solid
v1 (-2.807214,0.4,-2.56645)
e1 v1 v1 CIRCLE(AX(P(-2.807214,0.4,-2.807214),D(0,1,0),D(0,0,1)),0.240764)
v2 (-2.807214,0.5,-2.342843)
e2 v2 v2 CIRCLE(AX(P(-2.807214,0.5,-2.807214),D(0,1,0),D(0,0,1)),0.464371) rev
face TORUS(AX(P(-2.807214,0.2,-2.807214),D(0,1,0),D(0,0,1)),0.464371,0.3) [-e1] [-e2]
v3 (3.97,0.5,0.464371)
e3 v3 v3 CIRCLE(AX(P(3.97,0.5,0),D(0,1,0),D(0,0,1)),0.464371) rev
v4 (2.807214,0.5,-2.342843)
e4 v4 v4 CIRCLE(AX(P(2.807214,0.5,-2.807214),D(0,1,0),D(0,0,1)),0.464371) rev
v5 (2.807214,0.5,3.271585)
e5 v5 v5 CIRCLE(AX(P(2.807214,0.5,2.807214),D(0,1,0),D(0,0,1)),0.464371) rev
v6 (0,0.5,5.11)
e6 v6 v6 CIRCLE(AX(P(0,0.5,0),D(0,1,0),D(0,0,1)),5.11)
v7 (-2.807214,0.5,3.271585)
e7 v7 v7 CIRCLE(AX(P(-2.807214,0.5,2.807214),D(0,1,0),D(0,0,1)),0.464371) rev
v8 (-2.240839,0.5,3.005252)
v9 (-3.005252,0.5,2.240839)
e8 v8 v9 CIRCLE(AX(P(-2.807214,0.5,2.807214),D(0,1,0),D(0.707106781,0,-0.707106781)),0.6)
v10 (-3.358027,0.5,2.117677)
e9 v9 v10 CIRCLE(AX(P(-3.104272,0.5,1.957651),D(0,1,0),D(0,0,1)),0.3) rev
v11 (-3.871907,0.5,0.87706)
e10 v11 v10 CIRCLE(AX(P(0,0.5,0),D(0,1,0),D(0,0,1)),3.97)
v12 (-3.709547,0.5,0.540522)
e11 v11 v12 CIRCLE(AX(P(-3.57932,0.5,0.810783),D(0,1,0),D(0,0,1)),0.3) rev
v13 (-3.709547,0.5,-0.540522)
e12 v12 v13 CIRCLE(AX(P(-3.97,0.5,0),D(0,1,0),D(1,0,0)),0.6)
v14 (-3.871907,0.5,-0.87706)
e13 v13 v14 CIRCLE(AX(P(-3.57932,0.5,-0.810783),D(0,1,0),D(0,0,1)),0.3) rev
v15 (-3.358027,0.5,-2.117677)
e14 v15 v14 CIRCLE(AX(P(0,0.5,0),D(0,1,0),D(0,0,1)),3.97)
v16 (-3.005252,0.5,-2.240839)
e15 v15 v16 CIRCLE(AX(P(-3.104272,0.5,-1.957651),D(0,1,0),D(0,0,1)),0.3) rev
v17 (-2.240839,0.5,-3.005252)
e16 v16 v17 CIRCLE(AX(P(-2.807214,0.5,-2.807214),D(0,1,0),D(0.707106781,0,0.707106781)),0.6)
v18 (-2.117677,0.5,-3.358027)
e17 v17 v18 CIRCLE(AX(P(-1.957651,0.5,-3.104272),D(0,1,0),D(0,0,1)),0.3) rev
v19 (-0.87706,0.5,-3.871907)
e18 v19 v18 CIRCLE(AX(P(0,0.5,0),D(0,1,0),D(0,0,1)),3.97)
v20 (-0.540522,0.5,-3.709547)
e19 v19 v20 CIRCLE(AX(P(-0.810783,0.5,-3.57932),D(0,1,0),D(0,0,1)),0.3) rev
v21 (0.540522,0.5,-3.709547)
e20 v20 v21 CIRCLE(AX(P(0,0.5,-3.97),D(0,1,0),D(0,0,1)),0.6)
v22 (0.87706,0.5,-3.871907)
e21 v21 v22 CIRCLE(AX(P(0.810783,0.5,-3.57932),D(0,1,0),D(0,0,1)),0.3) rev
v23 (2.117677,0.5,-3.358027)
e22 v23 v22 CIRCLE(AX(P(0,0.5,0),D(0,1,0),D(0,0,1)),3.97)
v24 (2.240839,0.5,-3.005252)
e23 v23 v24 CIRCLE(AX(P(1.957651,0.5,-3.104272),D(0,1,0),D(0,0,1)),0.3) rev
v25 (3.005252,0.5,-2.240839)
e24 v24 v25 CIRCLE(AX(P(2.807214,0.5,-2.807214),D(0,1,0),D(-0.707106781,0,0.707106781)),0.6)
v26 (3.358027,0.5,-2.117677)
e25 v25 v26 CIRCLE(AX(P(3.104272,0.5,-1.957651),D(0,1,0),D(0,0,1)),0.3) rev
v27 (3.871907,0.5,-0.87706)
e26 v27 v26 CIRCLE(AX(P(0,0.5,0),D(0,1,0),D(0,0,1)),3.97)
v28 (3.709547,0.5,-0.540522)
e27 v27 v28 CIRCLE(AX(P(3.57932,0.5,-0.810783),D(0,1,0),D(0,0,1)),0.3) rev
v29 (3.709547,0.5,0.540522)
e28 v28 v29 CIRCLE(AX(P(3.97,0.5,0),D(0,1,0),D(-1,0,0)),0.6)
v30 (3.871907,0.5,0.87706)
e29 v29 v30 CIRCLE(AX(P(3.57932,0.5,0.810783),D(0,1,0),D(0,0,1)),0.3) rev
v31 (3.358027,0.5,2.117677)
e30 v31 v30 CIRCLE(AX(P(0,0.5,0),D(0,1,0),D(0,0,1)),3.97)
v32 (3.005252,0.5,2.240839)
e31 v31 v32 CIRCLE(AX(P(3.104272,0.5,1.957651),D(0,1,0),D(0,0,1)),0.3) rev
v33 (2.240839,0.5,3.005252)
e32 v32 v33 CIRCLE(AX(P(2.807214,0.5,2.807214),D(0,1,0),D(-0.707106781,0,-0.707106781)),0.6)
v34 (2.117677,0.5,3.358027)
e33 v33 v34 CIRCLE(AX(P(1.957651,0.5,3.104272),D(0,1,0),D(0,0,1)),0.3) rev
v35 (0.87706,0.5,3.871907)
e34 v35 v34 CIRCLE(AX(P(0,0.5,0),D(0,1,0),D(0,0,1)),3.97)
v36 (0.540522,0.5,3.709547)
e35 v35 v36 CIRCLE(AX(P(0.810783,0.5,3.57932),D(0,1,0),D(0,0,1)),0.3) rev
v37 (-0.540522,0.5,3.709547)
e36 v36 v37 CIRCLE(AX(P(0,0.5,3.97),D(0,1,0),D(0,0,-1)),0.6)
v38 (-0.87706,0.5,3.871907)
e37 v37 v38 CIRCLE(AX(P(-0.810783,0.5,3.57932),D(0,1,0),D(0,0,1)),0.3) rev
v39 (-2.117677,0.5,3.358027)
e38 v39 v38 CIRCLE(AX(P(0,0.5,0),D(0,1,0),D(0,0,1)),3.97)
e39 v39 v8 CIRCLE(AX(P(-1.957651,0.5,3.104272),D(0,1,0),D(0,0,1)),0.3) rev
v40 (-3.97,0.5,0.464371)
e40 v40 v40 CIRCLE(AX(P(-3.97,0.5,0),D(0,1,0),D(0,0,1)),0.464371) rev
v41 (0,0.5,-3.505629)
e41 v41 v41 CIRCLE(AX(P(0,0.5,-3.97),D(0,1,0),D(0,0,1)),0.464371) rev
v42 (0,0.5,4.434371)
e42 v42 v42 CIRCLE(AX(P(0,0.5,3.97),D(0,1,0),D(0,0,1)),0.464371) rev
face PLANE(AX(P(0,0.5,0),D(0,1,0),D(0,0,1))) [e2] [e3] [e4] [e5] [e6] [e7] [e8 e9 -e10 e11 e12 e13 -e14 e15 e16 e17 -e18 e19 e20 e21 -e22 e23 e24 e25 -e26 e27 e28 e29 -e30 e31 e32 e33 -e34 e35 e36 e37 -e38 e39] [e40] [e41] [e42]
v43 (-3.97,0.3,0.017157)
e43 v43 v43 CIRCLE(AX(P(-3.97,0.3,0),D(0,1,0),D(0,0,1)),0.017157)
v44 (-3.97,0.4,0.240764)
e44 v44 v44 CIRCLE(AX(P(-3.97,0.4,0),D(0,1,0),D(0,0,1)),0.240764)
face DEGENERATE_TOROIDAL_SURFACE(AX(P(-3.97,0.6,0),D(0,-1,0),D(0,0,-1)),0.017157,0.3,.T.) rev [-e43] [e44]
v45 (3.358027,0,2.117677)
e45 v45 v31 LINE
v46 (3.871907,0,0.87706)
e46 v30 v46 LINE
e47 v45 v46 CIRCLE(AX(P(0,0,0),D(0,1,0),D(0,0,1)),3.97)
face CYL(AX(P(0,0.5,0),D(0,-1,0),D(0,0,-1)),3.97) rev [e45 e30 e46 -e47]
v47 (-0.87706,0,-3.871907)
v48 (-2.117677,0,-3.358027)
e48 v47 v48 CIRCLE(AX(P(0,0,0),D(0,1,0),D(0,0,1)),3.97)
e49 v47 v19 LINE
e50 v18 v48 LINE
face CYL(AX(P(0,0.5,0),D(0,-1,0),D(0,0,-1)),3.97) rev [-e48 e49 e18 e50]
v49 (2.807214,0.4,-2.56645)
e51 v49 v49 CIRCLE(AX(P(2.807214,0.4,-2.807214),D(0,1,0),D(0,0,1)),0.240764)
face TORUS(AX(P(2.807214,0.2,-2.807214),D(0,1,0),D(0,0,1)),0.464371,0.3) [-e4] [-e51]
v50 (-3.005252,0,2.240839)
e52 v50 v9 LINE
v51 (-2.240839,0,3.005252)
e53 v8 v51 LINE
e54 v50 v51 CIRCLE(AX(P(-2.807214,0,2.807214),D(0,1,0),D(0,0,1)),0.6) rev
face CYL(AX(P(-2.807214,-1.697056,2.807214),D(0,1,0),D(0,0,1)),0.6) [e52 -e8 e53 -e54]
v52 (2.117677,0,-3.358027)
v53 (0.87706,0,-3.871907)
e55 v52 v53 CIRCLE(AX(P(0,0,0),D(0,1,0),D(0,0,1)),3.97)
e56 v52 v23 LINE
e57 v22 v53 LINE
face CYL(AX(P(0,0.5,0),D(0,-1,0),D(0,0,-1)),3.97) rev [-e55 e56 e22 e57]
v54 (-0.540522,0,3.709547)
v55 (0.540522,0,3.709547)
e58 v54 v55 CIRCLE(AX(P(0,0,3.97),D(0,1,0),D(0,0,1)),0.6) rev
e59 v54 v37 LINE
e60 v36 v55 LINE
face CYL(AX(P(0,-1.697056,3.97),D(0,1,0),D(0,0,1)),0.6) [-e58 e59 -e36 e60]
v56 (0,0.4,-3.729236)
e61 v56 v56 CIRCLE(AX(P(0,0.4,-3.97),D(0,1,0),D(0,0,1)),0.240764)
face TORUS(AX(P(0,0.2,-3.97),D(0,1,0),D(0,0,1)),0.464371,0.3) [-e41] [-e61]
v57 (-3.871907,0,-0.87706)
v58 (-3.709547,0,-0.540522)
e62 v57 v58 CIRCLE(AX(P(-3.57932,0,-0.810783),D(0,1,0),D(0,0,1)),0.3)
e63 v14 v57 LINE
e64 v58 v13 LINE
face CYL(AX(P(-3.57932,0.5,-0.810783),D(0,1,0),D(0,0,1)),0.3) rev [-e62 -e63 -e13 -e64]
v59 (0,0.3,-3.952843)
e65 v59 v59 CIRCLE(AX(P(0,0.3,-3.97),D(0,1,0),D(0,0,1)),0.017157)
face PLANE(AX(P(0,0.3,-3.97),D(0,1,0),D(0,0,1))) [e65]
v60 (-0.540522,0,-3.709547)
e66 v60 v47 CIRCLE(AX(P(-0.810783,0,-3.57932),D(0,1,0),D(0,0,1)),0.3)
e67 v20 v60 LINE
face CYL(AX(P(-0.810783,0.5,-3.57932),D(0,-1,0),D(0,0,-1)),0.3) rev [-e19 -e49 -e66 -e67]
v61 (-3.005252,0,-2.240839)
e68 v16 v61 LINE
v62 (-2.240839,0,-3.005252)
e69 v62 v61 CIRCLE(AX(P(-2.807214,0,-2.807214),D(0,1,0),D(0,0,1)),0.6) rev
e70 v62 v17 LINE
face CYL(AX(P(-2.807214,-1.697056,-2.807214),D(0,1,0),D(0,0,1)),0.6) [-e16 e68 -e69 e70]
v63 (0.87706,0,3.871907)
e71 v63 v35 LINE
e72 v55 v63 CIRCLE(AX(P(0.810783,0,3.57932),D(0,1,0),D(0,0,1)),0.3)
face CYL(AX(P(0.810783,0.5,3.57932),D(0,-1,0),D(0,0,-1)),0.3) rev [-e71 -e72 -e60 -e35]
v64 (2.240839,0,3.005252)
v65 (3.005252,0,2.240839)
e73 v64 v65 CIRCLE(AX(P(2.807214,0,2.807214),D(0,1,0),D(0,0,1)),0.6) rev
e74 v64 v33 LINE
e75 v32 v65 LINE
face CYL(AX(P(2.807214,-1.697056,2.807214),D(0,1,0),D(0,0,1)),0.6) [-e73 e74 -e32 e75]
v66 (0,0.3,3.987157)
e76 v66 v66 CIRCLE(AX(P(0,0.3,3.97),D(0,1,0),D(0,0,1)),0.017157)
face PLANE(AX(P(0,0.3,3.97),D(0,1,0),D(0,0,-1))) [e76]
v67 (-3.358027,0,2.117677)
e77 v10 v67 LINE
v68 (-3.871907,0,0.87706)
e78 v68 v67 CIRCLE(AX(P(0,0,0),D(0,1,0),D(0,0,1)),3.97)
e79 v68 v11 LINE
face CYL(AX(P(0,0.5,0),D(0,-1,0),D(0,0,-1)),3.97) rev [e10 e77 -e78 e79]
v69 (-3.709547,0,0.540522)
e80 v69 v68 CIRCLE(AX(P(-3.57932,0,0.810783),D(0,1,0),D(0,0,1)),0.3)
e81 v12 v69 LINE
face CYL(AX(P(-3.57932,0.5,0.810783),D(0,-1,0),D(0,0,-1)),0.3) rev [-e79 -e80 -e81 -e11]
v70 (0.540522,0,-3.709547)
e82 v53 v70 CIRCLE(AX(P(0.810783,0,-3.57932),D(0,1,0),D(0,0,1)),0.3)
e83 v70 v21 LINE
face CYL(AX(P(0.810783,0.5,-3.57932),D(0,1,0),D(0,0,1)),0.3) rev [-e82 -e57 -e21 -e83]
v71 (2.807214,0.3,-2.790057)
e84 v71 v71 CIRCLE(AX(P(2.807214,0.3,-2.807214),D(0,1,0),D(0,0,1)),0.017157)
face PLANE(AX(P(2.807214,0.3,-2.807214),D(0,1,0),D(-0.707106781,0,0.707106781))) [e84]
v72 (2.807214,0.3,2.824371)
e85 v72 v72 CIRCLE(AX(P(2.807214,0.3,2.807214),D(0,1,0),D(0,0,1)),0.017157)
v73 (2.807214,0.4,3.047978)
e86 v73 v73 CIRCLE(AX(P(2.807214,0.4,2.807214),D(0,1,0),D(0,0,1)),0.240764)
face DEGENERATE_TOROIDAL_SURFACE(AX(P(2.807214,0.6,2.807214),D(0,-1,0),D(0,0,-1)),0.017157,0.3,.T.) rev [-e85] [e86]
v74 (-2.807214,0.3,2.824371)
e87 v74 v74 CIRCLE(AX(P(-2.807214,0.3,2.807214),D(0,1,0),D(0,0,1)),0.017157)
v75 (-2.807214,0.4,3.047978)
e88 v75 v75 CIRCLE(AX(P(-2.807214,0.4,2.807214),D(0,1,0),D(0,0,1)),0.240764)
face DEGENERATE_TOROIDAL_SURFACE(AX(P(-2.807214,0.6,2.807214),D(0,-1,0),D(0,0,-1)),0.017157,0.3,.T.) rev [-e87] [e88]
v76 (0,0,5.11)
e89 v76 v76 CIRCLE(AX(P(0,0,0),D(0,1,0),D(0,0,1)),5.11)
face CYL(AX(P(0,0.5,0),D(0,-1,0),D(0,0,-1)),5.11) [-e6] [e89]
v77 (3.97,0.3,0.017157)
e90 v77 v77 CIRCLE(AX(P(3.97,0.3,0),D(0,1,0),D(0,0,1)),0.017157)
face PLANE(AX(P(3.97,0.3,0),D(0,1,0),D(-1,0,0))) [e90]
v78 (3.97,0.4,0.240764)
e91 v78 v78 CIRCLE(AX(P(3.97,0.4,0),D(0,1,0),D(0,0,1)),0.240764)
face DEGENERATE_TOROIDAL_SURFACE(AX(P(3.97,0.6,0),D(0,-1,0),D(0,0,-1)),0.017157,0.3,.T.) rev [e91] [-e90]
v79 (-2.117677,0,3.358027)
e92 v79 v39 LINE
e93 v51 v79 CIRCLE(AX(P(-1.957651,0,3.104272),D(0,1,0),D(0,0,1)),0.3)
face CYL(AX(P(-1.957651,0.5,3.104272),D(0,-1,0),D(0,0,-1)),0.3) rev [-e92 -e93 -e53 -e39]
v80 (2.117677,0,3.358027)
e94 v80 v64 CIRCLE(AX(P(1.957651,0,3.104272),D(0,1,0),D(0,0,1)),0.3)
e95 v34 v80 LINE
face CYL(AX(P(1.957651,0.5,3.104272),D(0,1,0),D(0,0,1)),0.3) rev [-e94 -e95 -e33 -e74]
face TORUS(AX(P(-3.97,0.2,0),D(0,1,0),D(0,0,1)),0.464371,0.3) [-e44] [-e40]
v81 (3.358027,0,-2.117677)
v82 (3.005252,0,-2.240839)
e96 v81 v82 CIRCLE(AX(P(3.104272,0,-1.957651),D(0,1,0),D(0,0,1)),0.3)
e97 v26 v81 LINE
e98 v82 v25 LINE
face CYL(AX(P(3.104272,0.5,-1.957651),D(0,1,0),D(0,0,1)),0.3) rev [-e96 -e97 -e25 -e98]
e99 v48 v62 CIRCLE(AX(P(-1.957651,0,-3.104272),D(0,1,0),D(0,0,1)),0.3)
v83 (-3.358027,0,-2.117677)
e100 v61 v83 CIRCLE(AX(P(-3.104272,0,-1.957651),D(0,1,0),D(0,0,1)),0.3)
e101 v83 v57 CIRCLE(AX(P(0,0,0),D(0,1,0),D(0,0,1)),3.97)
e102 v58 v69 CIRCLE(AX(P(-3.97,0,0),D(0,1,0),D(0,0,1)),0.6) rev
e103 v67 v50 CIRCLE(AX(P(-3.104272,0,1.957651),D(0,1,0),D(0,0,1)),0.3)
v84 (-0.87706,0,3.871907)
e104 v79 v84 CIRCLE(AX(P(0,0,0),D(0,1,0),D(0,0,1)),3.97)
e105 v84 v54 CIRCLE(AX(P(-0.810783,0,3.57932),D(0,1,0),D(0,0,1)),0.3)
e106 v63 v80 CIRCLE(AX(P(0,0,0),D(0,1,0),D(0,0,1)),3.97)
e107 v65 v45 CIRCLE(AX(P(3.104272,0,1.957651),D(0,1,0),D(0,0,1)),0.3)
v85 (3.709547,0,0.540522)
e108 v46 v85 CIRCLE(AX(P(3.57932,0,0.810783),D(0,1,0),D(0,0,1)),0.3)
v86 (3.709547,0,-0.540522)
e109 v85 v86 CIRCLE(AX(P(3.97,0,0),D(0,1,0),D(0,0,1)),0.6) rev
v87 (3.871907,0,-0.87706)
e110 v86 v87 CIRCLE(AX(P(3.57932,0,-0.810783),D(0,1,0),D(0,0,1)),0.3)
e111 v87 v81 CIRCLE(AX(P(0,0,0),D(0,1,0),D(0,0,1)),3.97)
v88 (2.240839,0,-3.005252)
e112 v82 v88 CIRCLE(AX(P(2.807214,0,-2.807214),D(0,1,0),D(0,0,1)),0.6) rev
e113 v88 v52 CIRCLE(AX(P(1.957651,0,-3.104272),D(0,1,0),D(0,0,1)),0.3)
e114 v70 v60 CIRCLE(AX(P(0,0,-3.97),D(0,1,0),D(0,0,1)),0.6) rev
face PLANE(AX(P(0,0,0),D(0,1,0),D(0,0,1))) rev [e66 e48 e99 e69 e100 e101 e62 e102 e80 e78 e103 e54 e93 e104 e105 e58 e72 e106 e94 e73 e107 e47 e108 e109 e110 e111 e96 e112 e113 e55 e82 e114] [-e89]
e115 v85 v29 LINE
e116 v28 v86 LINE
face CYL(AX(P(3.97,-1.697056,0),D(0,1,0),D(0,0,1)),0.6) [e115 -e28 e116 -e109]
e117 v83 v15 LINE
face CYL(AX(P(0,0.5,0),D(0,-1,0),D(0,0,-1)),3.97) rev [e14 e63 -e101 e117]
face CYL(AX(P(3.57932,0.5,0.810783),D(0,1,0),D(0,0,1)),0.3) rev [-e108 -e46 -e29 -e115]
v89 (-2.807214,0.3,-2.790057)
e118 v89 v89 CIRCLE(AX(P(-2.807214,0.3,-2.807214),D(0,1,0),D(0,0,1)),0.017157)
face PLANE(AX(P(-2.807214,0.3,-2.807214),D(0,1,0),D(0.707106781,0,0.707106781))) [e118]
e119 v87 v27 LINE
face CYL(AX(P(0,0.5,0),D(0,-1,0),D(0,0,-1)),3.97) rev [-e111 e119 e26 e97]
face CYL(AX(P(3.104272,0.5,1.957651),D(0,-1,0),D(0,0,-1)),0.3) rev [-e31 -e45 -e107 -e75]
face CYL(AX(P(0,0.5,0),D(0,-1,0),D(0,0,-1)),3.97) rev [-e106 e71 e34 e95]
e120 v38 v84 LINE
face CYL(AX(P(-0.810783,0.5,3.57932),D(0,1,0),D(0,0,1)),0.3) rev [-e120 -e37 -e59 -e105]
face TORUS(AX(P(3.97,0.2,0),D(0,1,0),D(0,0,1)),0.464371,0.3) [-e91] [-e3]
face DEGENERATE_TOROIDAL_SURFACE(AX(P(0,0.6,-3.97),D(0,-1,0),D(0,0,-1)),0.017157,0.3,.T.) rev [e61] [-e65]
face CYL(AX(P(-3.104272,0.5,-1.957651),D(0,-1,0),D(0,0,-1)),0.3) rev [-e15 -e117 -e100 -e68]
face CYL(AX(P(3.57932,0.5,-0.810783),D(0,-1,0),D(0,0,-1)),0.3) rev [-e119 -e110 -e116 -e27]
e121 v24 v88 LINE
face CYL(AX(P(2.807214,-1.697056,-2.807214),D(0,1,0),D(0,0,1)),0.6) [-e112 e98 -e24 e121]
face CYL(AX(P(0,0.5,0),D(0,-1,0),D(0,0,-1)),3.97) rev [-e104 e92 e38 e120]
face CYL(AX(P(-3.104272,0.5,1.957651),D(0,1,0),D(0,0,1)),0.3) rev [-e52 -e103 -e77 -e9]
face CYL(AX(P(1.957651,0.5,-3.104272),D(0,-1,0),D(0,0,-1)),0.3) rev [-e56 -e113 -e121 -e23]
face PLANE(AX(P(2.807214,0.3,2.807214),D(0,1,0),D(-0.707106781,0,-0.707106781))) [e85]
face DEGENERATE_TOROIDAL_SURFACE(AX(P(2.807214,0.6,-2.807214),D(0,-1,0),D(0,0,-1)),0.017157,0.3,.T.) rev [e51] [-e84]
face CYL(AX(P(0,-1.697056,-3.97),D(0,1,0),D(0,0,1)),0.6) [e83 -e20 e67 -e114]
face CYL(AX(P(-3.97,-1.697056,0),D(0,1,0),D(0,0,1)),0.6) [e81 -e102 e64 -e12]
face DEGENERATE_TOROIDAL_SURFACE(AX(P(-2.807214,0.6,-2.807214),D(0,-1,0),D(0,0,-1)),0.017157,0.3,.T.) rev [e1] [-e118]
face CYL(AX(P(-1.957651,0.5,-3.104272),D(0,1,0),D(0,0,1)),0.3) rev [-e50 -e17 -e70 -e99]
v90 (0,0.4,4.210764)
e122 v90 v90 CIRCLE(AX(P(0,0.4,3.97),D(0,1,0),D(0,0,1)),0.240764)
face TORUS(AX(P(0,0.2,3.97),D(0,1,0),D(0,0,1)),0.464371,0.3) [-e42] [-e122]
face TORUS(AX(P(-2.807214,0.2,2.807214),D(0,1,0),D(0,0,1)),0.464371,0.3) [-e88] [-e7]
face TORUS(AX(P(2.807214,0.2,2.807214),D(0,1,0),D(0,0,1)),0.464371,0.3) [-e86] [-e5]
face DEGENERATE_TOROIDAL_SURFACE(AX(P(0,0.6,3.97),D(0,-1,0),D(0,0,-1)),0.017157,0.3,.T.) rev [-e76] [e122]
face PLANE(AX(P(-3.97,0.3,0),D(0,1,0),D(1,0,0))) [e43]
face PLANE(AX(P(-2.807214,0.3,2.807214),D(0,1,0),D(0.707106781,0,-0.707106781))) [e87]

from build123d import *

# Parameters (mm, degrees)
SKETCH1_R                = 5.11
SKETCH1_R_2              = 3.97
BOSS_EXTRUDE1_DEPTH      = 0.5
SKETCH2_R                = 0.6
BOSS_EXTRUDE2_DEPTH      = 0.5
FILLET1_R                = 0.3
SKETCH5_R                = 0.3
CUT_EXTRUDE1_DEPTH       = 0.2
CIRPATTERN4_COUNT        = 8
FILLET1_OF_CIRPATTERN4_R = 0.3
FILLET2_R                = 0.3
FILLET3_R                = 0.3


with BuildPart() as part:
    # Sketch1 → Boss-Extrude1 (new body)
    with BuildSketch(Plane(origin=(0, 0, 0), x_dir=(1, 0, 0), z_dir=(0, 1, 0))):
        with Locations(Location((0, 0, 0), (0, 0, 270))):
            Circle(SKETCH1_R)
        with Locations(Location((0, 0, 0), (0, 0, 270))):
            Circle(SKETCH1_R_2, mode=Mode.SUBTRACT)
    extrude(amount=BOSS_EXTRUDE1_DEPTH)

    # Sketch2 → Boss-Extrude2 (add)
    with BuildSketch(Plane(origin=(0, 0.5, 0), x_dir=(1, 0, 0), z_dir=(0, 1, 0))):
        with Locations((0, 3.97)):
            Circle(SKETCH2_R)
    boss_extrude2 = extrude(amount=-BOSS_EXTRUDE2_DEPTH)

    # Fillet1
    fillet1_edges = [part.edges().sort_by_distance(p)[0] for p in [
        (-0.598284447, 0.25, -3.92465995),
        (0.598284447, 0.25, -3.92465995),
    ]]
    fillet(fillet1_edges, radius=FILLET1_R)

    # Sketch5 → Cut-Extrude1 (cut)
    with BuildSketch(Plane(origin=(0, 0.5, 0), x_dir=(1, 0, 0), z_dir=(0, 1, 0))):
        with Locations(Location((0, 3.97, 0), (0, 0, 270))):
            Circle(SKETCH5_R)
    cut_extrude1 = extrude(amount=-CUT_EXTRUDE1_DEPTH, mode=Mode.SUBTRACT)

    # CirPattern4: Boss-Extrude2, Cut-Extrude1 ×8 about axis
    cirpattern4_axis = Axis((0, 0, 0), (0, 1, 0))
    add([boss_extrude2.rotate(cirpattern4_axis, i * 360 / CIRPATTERN4_COUNT) for i in range(1, CIRPATTERN4_COUNT)])
    add([cut_extrude1.rotate(cirpattern4_axis, i * 360 / CIRPATTERN4_COUNT) for i in range(1, CIRPATTERN4_COUNT)], mode=Mode.SUBTRACT)

    # Fillet1 of CirPattern4
    fillet1_of_cirpattern4_edges = [part.edges().sort_by_distance(p)[0] for p in [
        (-3.198204654, 0.25, -2.352102674),
        (-2.352102674, 0.25, -3.198204654),
        (-3.92465995, 0.25, 0.598284447),
        (-3.92465995, 0.25, -0.598284447),
        (-2.352102674, 0.25, 3.198204654),
        (-3.198204654, 0.25, 2.352102674),
        (0.598284447, 0.25, 3.92465995),
        (-0.598284447, 0.25, 3.92465995),
        (3.198204654, 0.25, 2.352102674),
        (2.352102674, 0.25, 3.198204654),
        (3.92465995, 0.25, -0.598284447),
        (3.92465995, 0.25, 0.598284447),
        (2.352102674, 0.25, -3.198204654),
        (3.198204654, 0.25, -2.352102674),
    ]]
    fillet(fillet1_of_cirpattern4_edges, radius=FILLET1_OF_CIRPATTERN4_R)

    # Fillet2
    # the kernel refuses this fillet: 0.3 mm, written as the material it adds along each edge
    with BuildSketch(Plane(origin=(-2.807213921, 0.3, -2.807213921), x_dir=(0.7071067811865475, 0, 0.7071067811865475), z_dir=(-0.7071067811865475, 0, 0.7071067811865475))) as fillet2_piece_1:
        with BuildLine():
            CenterArc((0.017157288, 0.3), FILLET2_R, 270, 70.528779366)
            Line((0.017157288, 0), (0.017157288, -0.006))
            Line((0.017157288, -0.006), (0.3, -0.006))
            Line((0.3, -0.006), (0.306, 0))
            ThreePointArc((0.306, 0), (0.306, 0.1), (0.305656854, 0.198))
            Line((0.305656854, 0.198), (0.3, 0.2))
        make_face()
    revolve(axis=Axis((-2.807213921, 0.3, -2.807213921), (0, 1, 0)))
    with BuildSketch(Plane(origin=(-3.97, 0.3, 0), x_dir=(1, 0, 0), z_dir=(0, 0, 1))) as fillet2_piece_2:
        with BuildLine():
            CenterArc((0.017157288, 0.3), FILLET2_R, 270, 70.528779366)
            Line((0.017157288, 0), (0.017157288, -0.006))
            Line((0.017157288, -0.006), (0.3, -0.006))
            Line((0.3, -0.006), (0.306, 0))
            ThreePointArc((0.306, 0), (0.306, 0.1), (0.305656854, 0.198))
            Line((0.305656854, 0.198), (0.3, 0.2))
        make_face()
    revolve(axis=Axis((-3.97, 0.3, 0), (0, 1, 0)))
    with BuildSketch(Plane(origin=(-2.807213921, 0.3, 2.807213921), x_dir=(0.7071067811865475, 0, -0.7071067811865475), z_dir=(0.7071067811865475, 0, 0.7071067811865475))) as fillet2_piece_3:
        with BuildLine():
            CenterArc((0.017157288, 0.3), FILLET2_R, 270, 70.528779366)
            Line((0.017157288, 0), (0.017157288, -0.006))
            Line((0.017157288, -0.006), (0.3, -0.006))
            Line((0.3, -0.006), (0.306, 0))
            ThreePointArc((0.306, 0), (0.306, 0.1), (0.305656854, 0.198))
            Line((0.305656854, 0.198), (0.3, 0.2))
        make_face()
    revolve(axis=Axis((-2.807213921, 0.3, 2.807213921), (0, 1, 0)))
    with BuildSketch(Plane(origin=(0, 0.3, 3.97), x_dir=(0, 0, -1), z_dir=(1, 0, 0))) as fillet2_piece_4:
        with BuildLine():
            CenterArc((0.017157288, 0.3), FILLET2_R, 270, 70.528779366)
            Line((0.017157288, 0), (0.017157288, -0.006))
            Line((0.017157288, -0.006), (0.3, -0.006))
            Line((0.3, -0.006), (0.306, 0))
            ThreePointArc((0.306, 0), (0.306, 0.1), (0.305656854, 0.198))
            Line((0.305656854, 0.198), (0.3, 0.2))
        make_face()
    revolve(axis=Axis((0, 0.3, 3.97), (0, 1, 0)))
    with BuildSketch(Plane(origin=(2.807213921, 0.3, 2.807213921), x_dir=(-0.7071067811865475, 0, -0.7071067811865475), z_dir=(0.7071067811865475, 0, -0.7071067811865475))) as fillet2_piece_5:
        with BuildLine():
            CenterArc((0.017157288, 0.3), FILLET2_R, 270, 70.528779366)
            Line((0.017157288, 0), (0.017157288, -0.006))
            Line((0.017157288, -0.006), (0.3, -0.006))
            Line((0.3, -0.006), (0.306, 0))
            ThreePointArc((0.306, 0), (0.306, 0.1), (0.305656854, 0.198))
            Line((0.305656854, 0.198), (0.3, 0.2))
        make_face()
    revolve(axis=Axis((2.807213921, 0.3, 2.807213921), (0, 1, 0)))
    with BuildSketch(Plane(origin=(3.97, 0.3, 0), x_dir=(-1, 0, 0), z_dir=(0, 0, -1))) as fillet2_piece_6:
        with BuildLine():
            CenterArc((0.017157288, 0.3), FILLET2_R, 270, 70.528779366)
            Line((0.017157288, 0), (0.017157288, -0.006))
            Line((0.017157288, -0.006), (0.3, -0.006))
            Line((0.3, -0.006), (0.306, 0))
            ThreePointArc((0.306, 0), (0.306, 0.1), (0.305656854, 0.198))
            Line((0.305656854, 0.198), (0.3, 0.2))
        make_face()
    revolve(axis=Axis((3.97, 0.3, 0), (0, 1, 0)))
    with BuildSketch(Plane(origin=(2.807213921, 0.3, -2.807213921), x_dir=(-0.7071067811865475, 0, 0.7071067811865475), z_dir=(-0.7071067811865475, 0, -0.7071067811865475))) as fillet2_piece_7:
        with BuildLine():
            CenterArc((0.017157288, 0.3), FILLET2_R, 270, 70.528779366)
            Line((0.017157288, 0), (0.017157288, -0.006))
            Line((0.017157288, -0.006), (0.3, -0.006))
            Line((0.3, -0.006), (0.306, 0))
            ThreePointArc((0.306, 0), (0.306, 0.1), (0.305656854, 0.198))
            Line((0.305656854, 0.198), (0.3, 0.2))
        make_face()
    revolve(axis=Axis((2.807213921, 0.3, -2.807213921), (0, 1, 0)))
    with BuildSketch(Plane(origin=(0, 0.3, -3.97), x_dir=(0, 0, 1), z_dir=(-1, 0, 0))) as fillet2_piece_8:
        with BuildLine():
            CenterArc((0.017157288, 0.3), FILLET2_R, 270, 70.528779366)
            Line((0.017157288, 0), (0.017157288, -0.006))
            Line((0.017157288, -0.006), (0.3, -0.006))
            Line((0.3, -0.006), (0.306, 0))
            ThreePointArc((0.306, 0), (0.306, 0.1), (0.305656854, 0.198))
            Line((0.305656854, 0.198), (0.3, 0.2))
        make_face()
    revolve(axis=Axis((0, 0.3, -3.97), (0, 1, 0)))

    # Fillet3
    fillet3_edges = [part.edges().sort_by_distance(p)[0] for p in [
        (-3.019345956, 0.5, -3.019345956),
        (-4.27, 0.5, 0),
        (-3.019345956, 0.5, 3.019345956),
        (0, 0.5, 4.27),
        (3.019345956, 0.5, 3.019345956),
        (4.27, 0.5, 0),
        (3.019345956, 0.5, -3.019345956),
        (0, 0.5, -4.27),
    ]]
    fillet(fillet3_edges, radius=FILLET3_R)


solid = part.part
